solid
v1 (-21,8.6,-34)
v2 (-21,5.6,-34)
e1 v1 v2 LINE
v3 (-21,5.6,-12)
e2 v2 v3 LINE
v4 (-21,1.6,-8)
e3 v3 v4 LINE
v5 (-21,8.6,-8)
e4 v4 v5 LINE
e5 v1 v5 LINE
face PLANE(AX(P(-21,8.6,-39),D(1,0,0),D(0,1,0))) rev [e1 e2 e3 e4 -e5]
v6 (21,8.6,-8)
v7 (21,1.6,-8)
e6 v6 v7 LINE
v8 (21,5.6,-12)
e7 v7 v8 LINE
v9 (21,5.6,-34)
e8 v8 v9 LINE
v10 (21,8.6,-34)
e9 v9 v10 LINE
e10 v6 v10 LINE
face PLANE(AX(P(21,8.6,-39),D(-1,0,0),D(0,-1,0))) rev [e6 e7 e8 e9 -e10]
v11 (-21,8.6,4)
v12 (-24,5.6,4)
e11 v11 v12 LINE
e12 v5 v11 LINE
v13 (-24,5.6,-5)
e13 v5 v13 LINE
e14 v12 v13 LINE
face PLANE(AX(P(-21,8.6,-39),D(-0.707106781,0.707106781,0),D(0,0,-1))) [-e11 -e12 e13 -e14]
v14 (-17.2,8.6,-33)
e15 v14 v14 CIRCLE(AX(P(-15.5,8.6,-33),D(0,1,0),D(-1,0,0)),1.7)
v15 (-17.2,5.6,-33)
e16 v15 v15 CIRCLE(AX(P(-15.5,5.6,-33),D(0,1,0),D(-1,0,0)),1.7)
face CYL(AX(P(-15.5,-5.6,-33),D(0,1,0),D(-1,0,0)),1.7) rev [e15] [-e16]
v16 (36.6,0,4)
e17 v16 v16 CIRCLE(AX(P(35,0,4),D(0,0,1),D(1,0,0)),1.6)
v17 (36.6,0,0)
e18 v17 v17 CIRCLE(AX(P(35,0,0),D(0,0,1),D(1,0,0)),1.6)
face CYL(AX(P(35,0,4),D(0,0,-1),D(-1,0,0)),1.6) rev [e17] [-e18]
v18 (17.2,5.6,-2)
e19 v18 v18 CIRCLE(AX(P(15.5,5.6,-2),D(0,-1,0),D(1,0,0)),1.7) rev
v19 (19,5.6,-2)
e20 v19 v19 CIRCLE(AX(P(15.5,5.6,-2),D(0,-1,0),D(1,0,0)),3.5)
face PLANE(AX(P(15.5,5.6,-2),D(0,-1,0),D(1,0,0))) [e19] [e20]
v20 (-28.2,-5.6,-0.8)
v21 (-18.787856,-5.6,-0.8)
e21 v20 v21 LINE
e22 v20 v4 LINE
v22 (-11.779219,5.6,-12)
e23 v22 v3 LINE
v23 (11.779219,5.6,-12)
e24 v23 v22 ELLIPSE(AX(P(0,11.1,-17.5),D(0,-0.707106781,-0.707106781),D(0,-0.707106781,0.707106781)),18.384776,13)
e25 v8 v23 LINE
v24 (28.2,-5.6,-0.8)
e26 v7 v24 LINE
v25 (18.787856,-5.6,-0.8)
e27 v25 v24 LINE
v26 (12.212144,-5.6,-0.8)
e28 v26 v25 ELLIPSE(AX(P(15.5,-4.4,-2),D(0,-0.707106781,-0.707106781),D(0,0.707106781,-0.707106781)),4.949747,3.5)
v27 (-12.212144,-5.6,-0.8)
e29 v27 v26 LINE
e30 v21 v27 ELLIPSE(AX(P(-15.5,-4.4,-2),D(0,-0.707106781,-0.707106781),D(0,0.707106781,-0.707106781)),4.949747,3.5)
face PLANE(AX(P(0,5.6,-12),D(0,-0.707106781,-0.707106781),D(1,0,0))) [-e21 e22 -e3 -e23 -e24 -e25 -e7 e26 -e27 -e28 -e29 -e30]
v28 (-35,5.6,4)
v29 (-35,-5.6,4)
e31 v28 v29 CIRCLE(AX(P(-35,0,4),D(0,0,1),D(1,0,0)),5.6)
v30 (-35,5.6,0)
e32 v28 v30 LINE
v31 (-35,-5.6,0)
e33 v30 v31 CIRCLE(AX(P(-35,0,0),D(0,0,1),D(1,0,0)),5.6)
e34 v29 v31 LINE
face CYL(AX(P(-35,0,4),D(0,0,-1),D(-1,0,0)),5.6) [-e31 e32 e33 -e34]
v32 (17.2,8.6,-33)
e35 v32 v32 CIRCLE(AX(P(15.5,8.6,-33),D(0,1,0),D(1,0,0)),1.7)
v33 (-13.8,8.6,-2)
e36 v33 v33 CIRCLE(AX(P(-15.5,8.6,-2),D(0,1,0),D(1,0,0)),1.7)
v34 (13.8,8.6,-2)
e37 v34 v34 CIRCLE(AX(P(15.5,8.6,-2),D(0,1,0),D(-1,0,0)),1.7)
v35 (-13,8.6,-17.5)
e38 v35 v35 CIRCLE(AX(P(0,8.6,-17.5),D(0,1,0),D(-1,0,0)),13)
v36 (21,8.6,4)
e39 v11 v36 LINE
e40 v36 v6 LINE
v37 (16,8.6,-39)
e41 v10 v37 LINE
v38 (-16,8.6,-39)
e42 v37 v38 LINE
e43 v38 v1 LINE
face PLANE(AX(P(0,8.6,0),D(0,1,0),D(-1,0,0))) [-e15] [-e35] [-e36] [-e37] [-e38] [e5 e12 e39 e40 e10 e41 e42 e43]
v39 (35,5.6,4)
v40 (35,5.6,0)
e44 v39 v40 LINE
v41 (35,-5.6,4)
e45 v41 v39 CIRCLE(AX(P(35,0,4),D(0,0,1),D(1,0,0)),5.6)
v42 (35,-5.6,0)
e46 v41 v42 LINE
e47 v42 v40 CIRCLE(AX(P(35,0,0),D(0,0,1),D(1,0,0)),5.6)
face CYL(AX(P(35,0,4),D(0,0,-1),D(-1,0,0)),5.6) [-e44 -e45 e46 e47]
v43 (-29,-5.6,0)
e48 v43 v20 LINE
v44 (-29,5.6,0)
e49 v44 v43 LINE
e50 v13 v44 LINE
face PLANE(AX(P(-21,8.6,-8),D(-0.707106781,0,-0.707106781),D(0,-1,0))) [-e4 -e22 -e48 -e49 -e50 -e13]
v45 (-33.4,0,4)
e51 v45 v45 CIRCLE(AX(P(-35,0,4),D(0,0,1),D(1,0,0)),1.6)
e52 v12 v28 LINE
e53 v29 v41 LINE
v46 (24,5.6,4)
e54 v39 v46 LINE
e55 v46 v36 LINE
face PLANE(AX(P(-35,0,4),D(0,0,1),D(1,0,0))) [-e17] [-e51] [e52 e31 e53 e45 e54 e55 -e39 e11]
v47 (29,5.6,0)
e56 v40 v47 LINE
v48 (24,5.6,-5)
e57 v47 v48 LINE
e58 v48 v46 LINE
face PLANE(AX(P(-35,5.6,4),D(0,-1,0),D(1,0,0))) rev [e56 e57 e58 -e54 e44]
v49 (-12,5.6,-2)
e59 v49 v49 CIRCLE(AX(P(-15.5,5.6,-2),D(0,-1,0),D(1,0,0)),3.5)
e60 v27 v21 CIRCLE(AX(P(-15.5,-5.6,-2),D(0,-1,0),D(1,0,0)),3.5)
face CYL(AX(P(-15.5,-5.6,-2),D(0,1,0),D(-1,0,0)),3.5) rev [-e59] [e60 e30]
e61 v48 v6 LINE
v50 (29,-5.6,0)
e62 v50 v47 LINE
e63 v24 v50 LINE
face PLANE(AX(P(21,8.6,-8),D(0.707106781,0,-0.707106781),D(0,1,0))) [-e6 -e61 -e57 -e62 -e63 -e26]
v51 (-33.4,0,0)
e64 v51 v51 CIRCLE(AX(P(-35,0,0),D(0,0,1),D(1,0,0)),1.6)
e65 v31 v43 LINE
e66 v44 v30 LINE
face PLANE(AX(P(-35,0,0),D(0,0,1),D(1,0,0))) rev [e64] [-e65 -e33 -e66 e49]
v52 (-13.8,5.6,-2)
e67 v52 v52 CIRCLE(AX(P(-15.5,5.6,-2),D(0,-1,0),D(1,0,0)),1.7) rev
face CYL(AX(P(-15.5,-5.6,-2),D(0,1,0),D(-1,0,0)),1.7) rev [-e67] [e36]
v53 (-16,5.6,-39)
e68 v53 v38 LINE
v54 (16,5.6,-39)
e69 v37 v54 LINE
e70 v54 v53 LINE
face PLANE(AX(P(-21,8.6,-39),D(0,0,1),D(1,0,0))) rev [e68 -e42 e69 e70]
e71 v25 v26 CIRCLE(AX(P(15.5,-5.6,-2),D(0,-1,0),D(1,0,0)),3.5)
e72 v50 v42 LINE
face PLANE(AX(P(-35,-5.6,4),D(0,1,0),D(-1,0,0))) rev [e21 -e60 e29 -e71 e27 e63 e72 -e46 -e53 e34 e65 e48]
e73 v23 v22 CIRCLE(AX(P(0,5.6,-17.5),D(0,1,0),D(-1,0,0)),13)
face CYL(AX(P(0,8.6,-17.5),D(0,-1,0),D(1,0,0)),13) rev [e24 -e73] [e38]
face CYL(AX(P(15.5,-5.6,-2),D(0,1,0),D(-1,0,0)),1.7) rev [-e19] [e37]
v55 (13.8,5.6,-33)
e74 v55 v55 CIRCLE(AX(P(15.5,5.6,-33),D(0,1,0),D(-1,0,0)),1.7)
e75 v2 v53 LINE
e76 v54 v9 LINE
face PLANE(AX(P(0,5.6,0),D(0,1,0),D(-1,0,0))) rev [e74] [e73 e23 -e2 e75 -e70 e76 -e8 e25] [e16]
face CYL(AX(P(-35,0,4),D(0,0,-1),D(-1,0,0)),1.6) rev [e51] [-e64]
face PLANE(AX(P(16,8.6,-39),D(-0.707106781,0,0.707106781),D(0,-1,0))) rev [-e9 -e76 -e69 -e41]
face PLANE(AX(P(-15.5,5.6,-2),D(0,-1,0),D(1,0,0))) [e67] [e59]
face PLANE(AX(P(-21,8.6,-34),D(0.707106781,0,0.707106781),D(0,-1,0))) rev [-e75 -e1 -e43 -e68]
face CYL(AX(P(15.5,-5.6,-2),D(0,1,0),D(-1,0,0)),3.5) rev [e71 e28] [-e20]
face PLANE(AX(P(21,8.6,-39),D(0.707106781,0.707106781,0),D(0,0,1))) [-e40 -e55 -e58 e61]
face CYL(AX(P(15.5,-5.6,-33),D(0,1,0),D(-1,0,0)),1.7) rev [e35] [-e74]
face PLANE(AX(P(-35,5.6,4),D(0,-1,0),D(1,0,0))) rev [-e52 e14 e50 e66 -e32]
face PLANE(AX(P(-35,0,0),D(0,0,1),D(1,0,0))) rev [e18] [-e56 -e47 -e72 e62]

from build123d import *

# Parameters (mm, degrees)
ESBO_O1_R                = 1.6
RESSALTO_EXTRUS_O1_DEPTH = 4
ESBO_O2_W                = 42
ESBO_O2_H                = 43
ESBO_O2_R                = 13
RESSALTO_EXTRUS_O2_DEPTH = 3
CHANFRO1_SIZE            = 3
CHANFRO2_SIZE            = 5
CHANFRO3_SIZE            = 12
ESBO_O3_R                = 1.7
CORTE_EXTRUS_O1_DEPTH    = 59.060313468
ESBO_O4_R                = 3.5
CORTE_EXTRUS_O2_DEPTH    = 58.400348431
CHANFRO4_SIZE            = 8


# Some blends are built 0.0001 mm under size
with BuildPart() as part:
    # Esboço1 → Ressalto-extrusão1 (new body)
    with BuildSketch(Plane.XY):
        with BuildLine():
            Line((-35, 5.6), (35, 5.6))
            ThreePointArc((35, 5.6), (40.6, 0), (35, -5.6))
            Line((35, -5.6), (-35, -5.6))
            ThreePointArc((-35, -5.6), (-40.6, 0), (-35, 5.6))
        make_face()
        with Locations((35, 0)):
            Circle(ESBO_O1_R, mode=Mode.SUBTRACT)
        with Locations((-35, 0)):
            Circle(ESBO_O1_R, mode=Mode.SUBTRACT)
    extrude(amount=RESSALTO_EXTRUS_O1_DEPTH)

    # Esboço2 → Ressalto-extrusão2 (add)
    with BuildSketch(Plane(origin=(0, 5.6, 0), x_dir=(1, 0, 0), z_dir=(0, 1, 0))):
        with Locations((0, 17.5)):
            Rectangle(ESBO_O2_W, ESBO_O2_H)
        with Locations(Location((0, 17.5, 0), (0, 0, 180))):
            Circle(ESBO_O2_R, mode=Mode.SUBTRACT)
    extrude(amount=RESSALTO_EXTRUS_O2_DEPTH)

    # Chanfro1
    chanfro1_edges = [part.edges().sort_by_distance(p)[0] for p in [
        (21, 5.6, 2),
        (-21, 5.6, 2),
    ]]
    chamfer(chanfro1_edges, length=CHANFRO1_SIZE - 0.0001)  # a hair under: the kernel refuses the full size

    # Chanfro2
    chanfro2_edges = [part.edges().sort_by_distance(p)[0] for p in [
        (21, 7.1, -39),
        (-21, 7.1, -39),
    ]]
    chamfer(chanfro2_edges, length=CHANFRO2_SIZE)

    # Chanfro3
    # the kernel refuses this chamfer: 12 mm, written as the material it adds along each edge
    with BuildSketch(Plane(origin=(-21, 5.6, 0), x_dir=(0, 0.027495876610586417, -0.9996219169112968), z_dir=(1, 0, 0))) as chanfro3_piece_1_section:
        Polygon((CHANFRO3_SIZE * 0.999621916911, -CHANFRO3_SIZE * 0.0274958766106), (-CHANFRO3_SIZE * 0.0274958766106, -CHANFRO3_SIZE * 0.999621916911), (0, 0), align=None)
    chanfro3_piece_1 = extrude(amount=42, mode=Mode.PRIVATE)
    chanfro3_piece_1 = chanfro3_piece_1 - Plane(origin=(0, 1.3654596, -17.5), x_dir=(-1, 0, 0), z_dir=(0, -1, 0)) * Cylinder(13, 132, mode=Mode.PRIVATE)
    chanfro3_piece_1 = split(chanfro3_piece_1, bisect_by=Plane(origin=(0, -5.6, -3.473436689), z_dir=(0, 1, 0)), keep=Keep.TOP, mode=Mode.PRIVATE)
    add(chanfro3_piece_1)

    # Esboço3 → Corte-extrusão1 (cut, through all)
    with BuildSketch(Plane(origin=(0, 8.6, 0), x_dir=(1, 0, 0), z_dir=(0, 1, 0))):
        with Locations(Location((-15.5, 33, 0), (0, 0, 180))):
            Circle(ESBO_O3_R)
        with Locations(Location((15.5, 33, 0), (0, 0, 180))):
            Circle(ESBO_O3_R)
        with Locations(Location((15.5, 2, 0), (0, 0, 180))):
            Circle(ESBO_O3_R)
        with Locations(Location((-15.5, 2, 0), (0, 0, 224.900872156))):
            Circle(ESBO_O3_R)
    extrude(amount=-CORTE_EXTRUS_O1_DEPTH, mode=Mode.SUBTRACT)

    # Esboço4 → Corte-extrusão2 (cut, through all)
    with BuildSketch(Plane.XZ.offset(-5.6)):
        with Locations(Location((-15.5, -2, 0), (0, 0, 159.948957433))):
            Circle(ESBO_O4_R)
        with Locations(Location((15.5, -2, 0), (0, 0, 159.948957433))):
            Circle(ESBO_O4_R)
        with Locations((15.5, -33)):
            Circle(ESBO_O4_R)
        with Locations((-15.5, -33)):
            Circle(ESBO_O4_R)
    extrude(amount=CORTE_EXTRUS_O2_DEPTH, mode=Mode.SUBTRACT)

    # Chanfro4
    # the kernel refuses this chamfer: 8 mm, written as the material it adds along each edge
    with BuildSketch(Plane(origin=(21, 29.173363904, 0), x_dir=(-0.027495876610586494, 3.1525903256593395e-13, -0.9996219169112968), z_dir=(0, -1, 0))) as chanfro4_piece_1_section:
        Polygon((CHANFRO4_SIZE * 0.999621916911, CHANFRO4_SIZE * 0.0274958766106), (-CHANFRO4_SIZE * 0.0274958766106, CHANFRO4_SIZE * 0.999621916911), (0, 0), align=None)
    chanfro4_piece_1 = extrude(amount=34.773363904, mode=Mode.PRIVATE)
    chanfro4_piece_1 = split(chanfro4_piece_1, bisect_by=Plane(origin=(26.011530684, 3.588369316, -1.04435595), z_dir=(0.7071067811865474, 0.7071067811865478, 0)), keep=Keep.TOP, mode=Mode.PRIVATE)
    chanfro4_piece_1 = split(chanfro4_piece_1, bisect_by=Plane(origin=(26.682074245, 5.6, -1.04435595), z_dir=(0, -1, 0)), keep=Keep.TOP, mode=Mode.PRIVATE)
    add(chanfro4_piece_1)
    with BuildSketch(Plane(origin=(21, 29.173363904, 0), x_dir=(-0.027495876610586494, 3.1525903256593395e-13, -0.9996219169112968), z_dir=(0, -1, 0))) as chanfro4_piece_2_section:
        Polygon((CHANFRO4_SIZE * 0.999621916911, CHANFRO4_SIZE * 0.0274958766106), (-CHANFRO4_SIZE * 0.0274958766106, CHANFRO4_SIZE * 0.999621916911), (0, 0), align=None)
    chanfro4_piece_2 = extrude(amount=34.773363904, mode=Mode.PRIVATE)
    chanfro4_piece_2 = split(chanfro4_piece_2, bisect_by=Plane(origin=(22.348256975, 7.251643025, -3.639481653), z_dir=(-0.7071067811865474, -0.7071067811865478, 0)), keep=Keep.TOP, mode=Mode.PRIVATE)
    chanfro4_piece_2 = split(chanfro4_piece_2, bisect_by=Plane(origin=(21.792799579, 8.6, -3.639481653), z_dir=(0, -1, 0)), keep=Keep.TOP, mode=Mode.PRIVATE)
    chanfro4_piece_2 = split(chanfro4_piece_2, bisect_by=Plane(origin=(21.792799579, 5.6, -3.639481653), z_dir=(0, 1, 0)), keep=Keep.TOP, mode=Mode.PRIVATE)
    add(chanfro4_piece_2)
    with BuildSketch(Plane(origin=(21, 29.173363904, 0), x_dir=(-0.027495876610586494, 3.1525903256593395e-13, -0.9996219169112968), z_dir=(0, -1, 0))) as chanfro4_piece_3_section:
        Polygon((CHANFRO4_SIZE * 0.999621916911, CHANFRO4_SIZE * 0.0274958766106), (-CHANFRO4_SIZE * 0.0274958766106, CHANFRO4_SIZE * 0.999621916911), (0, 0), align=None)
    chanfro4_piece_3 = extrude(amount=34.773363904, mode=Mode.PRIVATE)
    chanfro4_piece_3 = split(chanfro4_piece_3, bisect_by=Plane(origin=(23.6247191, -1.786159604, -4.613840396), z_dir=(0, 0.7071067811862648, 0.7071067811868302)), keep=Keep.TOP, mode=Mode.PRIVATE)
    chanfro4_piece_3 = split(chanfro4_piece_3, bisect_by=Plane(origin=(26.361426714, 3.238473286, -2.325915119), z_dir=(-0.7071067811865474, -0.7071067811865478, 0)), keep=Keep.TOP, mode=Mode.PRIVATE)
    chanfro4_piece_3 = split(chanfro4_piece_3, bisect_by=Plane(origin=(23.6247191, 5.6, -2.325915119), z_dir=(0, -1, 0)), keep=Keep.TOP, mode=Mode.PRIVATE)
    add(chanfro4_piece_3)
    with BuildSketch(Plane(origin=(-21, -5.6, 0), x_dir=(0.027495876610578507, 3.1525903256593415e-13, -0.999621916911297), z_dir=(0, 1, 0))) as chanfro4_piece_4_section:
        Polygon((CHANFRO4_SIZE * 0.999621916911, CHANFRO4_SIZE * 0.0274958766106), (-CHANFRO4_SIZE * 0.0274958766111, CHANFRO4_SIZE * 0.999621916911), (0, 0), align=None)
    chanfro4_piece_4 = extrude(amount=34.773363904, mode=Mode.PRIVATE)
    chanfro4_piece_4 = split(chanfro4_piece_4, bisect_by=Plane(origin=(-23.6247191, -1.786159604, -4.613840396), z_dir=(0, 0.7071067811862648, 0.7071067811868302)), keep=Keep.TOP, mode=Mode.PRIVATE)
    chanfro4_piece_4 = split(chanfro4_piece_4, bisect_by=Plane(origin=(-26.361426714, 3.238473286, -2.325915119), z_dir=(0.7071067811865477, -0.7071067811865475, 0)), keep=Keep.TOP, mode=Mode.PRIVATE)
    chanfro4_piece_4 = split(chanfro4_piece_4, bisect_by=Plane(origin=(-23.6247191, 5.6, -2.325915119), z_dir=(0, -1, 0)), keep=Keep.TOP, mode=Mode.PRIVATE)
    add(chanfro4_piece_4)
    with BuildSketch(Plane(origin=(-21, -5.6, 0), x_dir=(0.027495876610578507, 3.1525903256593415e-13, -0.999621916911297), z_dir=(0, 1, 0))) as chanfro4_piece_5_section:
        Polygon((CHANFRO4_SIZE * 0.999621916911, CHANFRO4_SIZE * 0.0274958766106), (-CHANFRO4_SIZE * 0.0274958766111, CHANFRO4_SIZE * 0.999621916911), (0, 0), align=None)
    chanfro4_piece_5 = extrude(amount=34.773363904, mode=Mode.PRIVATE)
    chanfro4_piece_5 = split(chanfro4_piece_5, bisect_by=Plane(origin=(-26.011530684, 3.588369316, -1.04435595), z_dir=(-0.7071067811865477, 0.7071067811865475, 0)), keep=Keep.TOP, mode=Mode.PRIVATE)
    chanfro4_piece_5 = split(chanfro4_piece_5, bisect_by=Plane(origin=(-26.682074245, 5.6, -1.04435595), z_dir=(0, -1, 0)), keep=Keep.TOP, mode=Mode.PRIVATE)
    add(chanfro4_piece_5)
    with BuildSketch(Plane(origin=(-21, -5.6, 0), x_dir=(0.027495876610578507, 3.1525903256593415e-13, -0.999621916911297), z_dir=(0, 1, 0))) as chanfro4_piece_6_section:
        Polygon((CHANFRO4_SIZE * 0.999621916911, CHANFRO4_SIZE * 0.0274958766106), (-CHANFRO4_SIZE * 0.0274958766111, CHANFRO4_SIZE * 0.999621916911), (0, 0), align=None)
    chanfro4_piece_6 = extrude(amount=34.773363904, mode=Mode.PRIVATE)
    chanfro4_piece_6 = split(chanfro4_piece_6, bisect_by=Plane(origin=(-22.348256975, 7.251643025, -3.639481653), z_dir=(0.7071067811865477, -0.7071067811865475, 0)), keep=Keep.TOP, mode=Mode.PRIVATE)
    chanfro4_piece_6 = split(chanfro4_piece_6, bisect_by=Plane(origin=(-21.792799579, 8.6, -3.639481653), z_dir=(0, -1, 0)), keep=Keep.TOP, mode=Mode.PRIVATE)
    chanfro4_piece_6 = split(chanfro4_piece_6, bisect_by=Plane(origin=(-21.792799579, 5.6, -3.639481653), z_dir=(0, 1, 0)), keep=Keep.TOP, mode=Mode.PRIVATE)
    add(chanfro4_piece_6)


solid = part.part
